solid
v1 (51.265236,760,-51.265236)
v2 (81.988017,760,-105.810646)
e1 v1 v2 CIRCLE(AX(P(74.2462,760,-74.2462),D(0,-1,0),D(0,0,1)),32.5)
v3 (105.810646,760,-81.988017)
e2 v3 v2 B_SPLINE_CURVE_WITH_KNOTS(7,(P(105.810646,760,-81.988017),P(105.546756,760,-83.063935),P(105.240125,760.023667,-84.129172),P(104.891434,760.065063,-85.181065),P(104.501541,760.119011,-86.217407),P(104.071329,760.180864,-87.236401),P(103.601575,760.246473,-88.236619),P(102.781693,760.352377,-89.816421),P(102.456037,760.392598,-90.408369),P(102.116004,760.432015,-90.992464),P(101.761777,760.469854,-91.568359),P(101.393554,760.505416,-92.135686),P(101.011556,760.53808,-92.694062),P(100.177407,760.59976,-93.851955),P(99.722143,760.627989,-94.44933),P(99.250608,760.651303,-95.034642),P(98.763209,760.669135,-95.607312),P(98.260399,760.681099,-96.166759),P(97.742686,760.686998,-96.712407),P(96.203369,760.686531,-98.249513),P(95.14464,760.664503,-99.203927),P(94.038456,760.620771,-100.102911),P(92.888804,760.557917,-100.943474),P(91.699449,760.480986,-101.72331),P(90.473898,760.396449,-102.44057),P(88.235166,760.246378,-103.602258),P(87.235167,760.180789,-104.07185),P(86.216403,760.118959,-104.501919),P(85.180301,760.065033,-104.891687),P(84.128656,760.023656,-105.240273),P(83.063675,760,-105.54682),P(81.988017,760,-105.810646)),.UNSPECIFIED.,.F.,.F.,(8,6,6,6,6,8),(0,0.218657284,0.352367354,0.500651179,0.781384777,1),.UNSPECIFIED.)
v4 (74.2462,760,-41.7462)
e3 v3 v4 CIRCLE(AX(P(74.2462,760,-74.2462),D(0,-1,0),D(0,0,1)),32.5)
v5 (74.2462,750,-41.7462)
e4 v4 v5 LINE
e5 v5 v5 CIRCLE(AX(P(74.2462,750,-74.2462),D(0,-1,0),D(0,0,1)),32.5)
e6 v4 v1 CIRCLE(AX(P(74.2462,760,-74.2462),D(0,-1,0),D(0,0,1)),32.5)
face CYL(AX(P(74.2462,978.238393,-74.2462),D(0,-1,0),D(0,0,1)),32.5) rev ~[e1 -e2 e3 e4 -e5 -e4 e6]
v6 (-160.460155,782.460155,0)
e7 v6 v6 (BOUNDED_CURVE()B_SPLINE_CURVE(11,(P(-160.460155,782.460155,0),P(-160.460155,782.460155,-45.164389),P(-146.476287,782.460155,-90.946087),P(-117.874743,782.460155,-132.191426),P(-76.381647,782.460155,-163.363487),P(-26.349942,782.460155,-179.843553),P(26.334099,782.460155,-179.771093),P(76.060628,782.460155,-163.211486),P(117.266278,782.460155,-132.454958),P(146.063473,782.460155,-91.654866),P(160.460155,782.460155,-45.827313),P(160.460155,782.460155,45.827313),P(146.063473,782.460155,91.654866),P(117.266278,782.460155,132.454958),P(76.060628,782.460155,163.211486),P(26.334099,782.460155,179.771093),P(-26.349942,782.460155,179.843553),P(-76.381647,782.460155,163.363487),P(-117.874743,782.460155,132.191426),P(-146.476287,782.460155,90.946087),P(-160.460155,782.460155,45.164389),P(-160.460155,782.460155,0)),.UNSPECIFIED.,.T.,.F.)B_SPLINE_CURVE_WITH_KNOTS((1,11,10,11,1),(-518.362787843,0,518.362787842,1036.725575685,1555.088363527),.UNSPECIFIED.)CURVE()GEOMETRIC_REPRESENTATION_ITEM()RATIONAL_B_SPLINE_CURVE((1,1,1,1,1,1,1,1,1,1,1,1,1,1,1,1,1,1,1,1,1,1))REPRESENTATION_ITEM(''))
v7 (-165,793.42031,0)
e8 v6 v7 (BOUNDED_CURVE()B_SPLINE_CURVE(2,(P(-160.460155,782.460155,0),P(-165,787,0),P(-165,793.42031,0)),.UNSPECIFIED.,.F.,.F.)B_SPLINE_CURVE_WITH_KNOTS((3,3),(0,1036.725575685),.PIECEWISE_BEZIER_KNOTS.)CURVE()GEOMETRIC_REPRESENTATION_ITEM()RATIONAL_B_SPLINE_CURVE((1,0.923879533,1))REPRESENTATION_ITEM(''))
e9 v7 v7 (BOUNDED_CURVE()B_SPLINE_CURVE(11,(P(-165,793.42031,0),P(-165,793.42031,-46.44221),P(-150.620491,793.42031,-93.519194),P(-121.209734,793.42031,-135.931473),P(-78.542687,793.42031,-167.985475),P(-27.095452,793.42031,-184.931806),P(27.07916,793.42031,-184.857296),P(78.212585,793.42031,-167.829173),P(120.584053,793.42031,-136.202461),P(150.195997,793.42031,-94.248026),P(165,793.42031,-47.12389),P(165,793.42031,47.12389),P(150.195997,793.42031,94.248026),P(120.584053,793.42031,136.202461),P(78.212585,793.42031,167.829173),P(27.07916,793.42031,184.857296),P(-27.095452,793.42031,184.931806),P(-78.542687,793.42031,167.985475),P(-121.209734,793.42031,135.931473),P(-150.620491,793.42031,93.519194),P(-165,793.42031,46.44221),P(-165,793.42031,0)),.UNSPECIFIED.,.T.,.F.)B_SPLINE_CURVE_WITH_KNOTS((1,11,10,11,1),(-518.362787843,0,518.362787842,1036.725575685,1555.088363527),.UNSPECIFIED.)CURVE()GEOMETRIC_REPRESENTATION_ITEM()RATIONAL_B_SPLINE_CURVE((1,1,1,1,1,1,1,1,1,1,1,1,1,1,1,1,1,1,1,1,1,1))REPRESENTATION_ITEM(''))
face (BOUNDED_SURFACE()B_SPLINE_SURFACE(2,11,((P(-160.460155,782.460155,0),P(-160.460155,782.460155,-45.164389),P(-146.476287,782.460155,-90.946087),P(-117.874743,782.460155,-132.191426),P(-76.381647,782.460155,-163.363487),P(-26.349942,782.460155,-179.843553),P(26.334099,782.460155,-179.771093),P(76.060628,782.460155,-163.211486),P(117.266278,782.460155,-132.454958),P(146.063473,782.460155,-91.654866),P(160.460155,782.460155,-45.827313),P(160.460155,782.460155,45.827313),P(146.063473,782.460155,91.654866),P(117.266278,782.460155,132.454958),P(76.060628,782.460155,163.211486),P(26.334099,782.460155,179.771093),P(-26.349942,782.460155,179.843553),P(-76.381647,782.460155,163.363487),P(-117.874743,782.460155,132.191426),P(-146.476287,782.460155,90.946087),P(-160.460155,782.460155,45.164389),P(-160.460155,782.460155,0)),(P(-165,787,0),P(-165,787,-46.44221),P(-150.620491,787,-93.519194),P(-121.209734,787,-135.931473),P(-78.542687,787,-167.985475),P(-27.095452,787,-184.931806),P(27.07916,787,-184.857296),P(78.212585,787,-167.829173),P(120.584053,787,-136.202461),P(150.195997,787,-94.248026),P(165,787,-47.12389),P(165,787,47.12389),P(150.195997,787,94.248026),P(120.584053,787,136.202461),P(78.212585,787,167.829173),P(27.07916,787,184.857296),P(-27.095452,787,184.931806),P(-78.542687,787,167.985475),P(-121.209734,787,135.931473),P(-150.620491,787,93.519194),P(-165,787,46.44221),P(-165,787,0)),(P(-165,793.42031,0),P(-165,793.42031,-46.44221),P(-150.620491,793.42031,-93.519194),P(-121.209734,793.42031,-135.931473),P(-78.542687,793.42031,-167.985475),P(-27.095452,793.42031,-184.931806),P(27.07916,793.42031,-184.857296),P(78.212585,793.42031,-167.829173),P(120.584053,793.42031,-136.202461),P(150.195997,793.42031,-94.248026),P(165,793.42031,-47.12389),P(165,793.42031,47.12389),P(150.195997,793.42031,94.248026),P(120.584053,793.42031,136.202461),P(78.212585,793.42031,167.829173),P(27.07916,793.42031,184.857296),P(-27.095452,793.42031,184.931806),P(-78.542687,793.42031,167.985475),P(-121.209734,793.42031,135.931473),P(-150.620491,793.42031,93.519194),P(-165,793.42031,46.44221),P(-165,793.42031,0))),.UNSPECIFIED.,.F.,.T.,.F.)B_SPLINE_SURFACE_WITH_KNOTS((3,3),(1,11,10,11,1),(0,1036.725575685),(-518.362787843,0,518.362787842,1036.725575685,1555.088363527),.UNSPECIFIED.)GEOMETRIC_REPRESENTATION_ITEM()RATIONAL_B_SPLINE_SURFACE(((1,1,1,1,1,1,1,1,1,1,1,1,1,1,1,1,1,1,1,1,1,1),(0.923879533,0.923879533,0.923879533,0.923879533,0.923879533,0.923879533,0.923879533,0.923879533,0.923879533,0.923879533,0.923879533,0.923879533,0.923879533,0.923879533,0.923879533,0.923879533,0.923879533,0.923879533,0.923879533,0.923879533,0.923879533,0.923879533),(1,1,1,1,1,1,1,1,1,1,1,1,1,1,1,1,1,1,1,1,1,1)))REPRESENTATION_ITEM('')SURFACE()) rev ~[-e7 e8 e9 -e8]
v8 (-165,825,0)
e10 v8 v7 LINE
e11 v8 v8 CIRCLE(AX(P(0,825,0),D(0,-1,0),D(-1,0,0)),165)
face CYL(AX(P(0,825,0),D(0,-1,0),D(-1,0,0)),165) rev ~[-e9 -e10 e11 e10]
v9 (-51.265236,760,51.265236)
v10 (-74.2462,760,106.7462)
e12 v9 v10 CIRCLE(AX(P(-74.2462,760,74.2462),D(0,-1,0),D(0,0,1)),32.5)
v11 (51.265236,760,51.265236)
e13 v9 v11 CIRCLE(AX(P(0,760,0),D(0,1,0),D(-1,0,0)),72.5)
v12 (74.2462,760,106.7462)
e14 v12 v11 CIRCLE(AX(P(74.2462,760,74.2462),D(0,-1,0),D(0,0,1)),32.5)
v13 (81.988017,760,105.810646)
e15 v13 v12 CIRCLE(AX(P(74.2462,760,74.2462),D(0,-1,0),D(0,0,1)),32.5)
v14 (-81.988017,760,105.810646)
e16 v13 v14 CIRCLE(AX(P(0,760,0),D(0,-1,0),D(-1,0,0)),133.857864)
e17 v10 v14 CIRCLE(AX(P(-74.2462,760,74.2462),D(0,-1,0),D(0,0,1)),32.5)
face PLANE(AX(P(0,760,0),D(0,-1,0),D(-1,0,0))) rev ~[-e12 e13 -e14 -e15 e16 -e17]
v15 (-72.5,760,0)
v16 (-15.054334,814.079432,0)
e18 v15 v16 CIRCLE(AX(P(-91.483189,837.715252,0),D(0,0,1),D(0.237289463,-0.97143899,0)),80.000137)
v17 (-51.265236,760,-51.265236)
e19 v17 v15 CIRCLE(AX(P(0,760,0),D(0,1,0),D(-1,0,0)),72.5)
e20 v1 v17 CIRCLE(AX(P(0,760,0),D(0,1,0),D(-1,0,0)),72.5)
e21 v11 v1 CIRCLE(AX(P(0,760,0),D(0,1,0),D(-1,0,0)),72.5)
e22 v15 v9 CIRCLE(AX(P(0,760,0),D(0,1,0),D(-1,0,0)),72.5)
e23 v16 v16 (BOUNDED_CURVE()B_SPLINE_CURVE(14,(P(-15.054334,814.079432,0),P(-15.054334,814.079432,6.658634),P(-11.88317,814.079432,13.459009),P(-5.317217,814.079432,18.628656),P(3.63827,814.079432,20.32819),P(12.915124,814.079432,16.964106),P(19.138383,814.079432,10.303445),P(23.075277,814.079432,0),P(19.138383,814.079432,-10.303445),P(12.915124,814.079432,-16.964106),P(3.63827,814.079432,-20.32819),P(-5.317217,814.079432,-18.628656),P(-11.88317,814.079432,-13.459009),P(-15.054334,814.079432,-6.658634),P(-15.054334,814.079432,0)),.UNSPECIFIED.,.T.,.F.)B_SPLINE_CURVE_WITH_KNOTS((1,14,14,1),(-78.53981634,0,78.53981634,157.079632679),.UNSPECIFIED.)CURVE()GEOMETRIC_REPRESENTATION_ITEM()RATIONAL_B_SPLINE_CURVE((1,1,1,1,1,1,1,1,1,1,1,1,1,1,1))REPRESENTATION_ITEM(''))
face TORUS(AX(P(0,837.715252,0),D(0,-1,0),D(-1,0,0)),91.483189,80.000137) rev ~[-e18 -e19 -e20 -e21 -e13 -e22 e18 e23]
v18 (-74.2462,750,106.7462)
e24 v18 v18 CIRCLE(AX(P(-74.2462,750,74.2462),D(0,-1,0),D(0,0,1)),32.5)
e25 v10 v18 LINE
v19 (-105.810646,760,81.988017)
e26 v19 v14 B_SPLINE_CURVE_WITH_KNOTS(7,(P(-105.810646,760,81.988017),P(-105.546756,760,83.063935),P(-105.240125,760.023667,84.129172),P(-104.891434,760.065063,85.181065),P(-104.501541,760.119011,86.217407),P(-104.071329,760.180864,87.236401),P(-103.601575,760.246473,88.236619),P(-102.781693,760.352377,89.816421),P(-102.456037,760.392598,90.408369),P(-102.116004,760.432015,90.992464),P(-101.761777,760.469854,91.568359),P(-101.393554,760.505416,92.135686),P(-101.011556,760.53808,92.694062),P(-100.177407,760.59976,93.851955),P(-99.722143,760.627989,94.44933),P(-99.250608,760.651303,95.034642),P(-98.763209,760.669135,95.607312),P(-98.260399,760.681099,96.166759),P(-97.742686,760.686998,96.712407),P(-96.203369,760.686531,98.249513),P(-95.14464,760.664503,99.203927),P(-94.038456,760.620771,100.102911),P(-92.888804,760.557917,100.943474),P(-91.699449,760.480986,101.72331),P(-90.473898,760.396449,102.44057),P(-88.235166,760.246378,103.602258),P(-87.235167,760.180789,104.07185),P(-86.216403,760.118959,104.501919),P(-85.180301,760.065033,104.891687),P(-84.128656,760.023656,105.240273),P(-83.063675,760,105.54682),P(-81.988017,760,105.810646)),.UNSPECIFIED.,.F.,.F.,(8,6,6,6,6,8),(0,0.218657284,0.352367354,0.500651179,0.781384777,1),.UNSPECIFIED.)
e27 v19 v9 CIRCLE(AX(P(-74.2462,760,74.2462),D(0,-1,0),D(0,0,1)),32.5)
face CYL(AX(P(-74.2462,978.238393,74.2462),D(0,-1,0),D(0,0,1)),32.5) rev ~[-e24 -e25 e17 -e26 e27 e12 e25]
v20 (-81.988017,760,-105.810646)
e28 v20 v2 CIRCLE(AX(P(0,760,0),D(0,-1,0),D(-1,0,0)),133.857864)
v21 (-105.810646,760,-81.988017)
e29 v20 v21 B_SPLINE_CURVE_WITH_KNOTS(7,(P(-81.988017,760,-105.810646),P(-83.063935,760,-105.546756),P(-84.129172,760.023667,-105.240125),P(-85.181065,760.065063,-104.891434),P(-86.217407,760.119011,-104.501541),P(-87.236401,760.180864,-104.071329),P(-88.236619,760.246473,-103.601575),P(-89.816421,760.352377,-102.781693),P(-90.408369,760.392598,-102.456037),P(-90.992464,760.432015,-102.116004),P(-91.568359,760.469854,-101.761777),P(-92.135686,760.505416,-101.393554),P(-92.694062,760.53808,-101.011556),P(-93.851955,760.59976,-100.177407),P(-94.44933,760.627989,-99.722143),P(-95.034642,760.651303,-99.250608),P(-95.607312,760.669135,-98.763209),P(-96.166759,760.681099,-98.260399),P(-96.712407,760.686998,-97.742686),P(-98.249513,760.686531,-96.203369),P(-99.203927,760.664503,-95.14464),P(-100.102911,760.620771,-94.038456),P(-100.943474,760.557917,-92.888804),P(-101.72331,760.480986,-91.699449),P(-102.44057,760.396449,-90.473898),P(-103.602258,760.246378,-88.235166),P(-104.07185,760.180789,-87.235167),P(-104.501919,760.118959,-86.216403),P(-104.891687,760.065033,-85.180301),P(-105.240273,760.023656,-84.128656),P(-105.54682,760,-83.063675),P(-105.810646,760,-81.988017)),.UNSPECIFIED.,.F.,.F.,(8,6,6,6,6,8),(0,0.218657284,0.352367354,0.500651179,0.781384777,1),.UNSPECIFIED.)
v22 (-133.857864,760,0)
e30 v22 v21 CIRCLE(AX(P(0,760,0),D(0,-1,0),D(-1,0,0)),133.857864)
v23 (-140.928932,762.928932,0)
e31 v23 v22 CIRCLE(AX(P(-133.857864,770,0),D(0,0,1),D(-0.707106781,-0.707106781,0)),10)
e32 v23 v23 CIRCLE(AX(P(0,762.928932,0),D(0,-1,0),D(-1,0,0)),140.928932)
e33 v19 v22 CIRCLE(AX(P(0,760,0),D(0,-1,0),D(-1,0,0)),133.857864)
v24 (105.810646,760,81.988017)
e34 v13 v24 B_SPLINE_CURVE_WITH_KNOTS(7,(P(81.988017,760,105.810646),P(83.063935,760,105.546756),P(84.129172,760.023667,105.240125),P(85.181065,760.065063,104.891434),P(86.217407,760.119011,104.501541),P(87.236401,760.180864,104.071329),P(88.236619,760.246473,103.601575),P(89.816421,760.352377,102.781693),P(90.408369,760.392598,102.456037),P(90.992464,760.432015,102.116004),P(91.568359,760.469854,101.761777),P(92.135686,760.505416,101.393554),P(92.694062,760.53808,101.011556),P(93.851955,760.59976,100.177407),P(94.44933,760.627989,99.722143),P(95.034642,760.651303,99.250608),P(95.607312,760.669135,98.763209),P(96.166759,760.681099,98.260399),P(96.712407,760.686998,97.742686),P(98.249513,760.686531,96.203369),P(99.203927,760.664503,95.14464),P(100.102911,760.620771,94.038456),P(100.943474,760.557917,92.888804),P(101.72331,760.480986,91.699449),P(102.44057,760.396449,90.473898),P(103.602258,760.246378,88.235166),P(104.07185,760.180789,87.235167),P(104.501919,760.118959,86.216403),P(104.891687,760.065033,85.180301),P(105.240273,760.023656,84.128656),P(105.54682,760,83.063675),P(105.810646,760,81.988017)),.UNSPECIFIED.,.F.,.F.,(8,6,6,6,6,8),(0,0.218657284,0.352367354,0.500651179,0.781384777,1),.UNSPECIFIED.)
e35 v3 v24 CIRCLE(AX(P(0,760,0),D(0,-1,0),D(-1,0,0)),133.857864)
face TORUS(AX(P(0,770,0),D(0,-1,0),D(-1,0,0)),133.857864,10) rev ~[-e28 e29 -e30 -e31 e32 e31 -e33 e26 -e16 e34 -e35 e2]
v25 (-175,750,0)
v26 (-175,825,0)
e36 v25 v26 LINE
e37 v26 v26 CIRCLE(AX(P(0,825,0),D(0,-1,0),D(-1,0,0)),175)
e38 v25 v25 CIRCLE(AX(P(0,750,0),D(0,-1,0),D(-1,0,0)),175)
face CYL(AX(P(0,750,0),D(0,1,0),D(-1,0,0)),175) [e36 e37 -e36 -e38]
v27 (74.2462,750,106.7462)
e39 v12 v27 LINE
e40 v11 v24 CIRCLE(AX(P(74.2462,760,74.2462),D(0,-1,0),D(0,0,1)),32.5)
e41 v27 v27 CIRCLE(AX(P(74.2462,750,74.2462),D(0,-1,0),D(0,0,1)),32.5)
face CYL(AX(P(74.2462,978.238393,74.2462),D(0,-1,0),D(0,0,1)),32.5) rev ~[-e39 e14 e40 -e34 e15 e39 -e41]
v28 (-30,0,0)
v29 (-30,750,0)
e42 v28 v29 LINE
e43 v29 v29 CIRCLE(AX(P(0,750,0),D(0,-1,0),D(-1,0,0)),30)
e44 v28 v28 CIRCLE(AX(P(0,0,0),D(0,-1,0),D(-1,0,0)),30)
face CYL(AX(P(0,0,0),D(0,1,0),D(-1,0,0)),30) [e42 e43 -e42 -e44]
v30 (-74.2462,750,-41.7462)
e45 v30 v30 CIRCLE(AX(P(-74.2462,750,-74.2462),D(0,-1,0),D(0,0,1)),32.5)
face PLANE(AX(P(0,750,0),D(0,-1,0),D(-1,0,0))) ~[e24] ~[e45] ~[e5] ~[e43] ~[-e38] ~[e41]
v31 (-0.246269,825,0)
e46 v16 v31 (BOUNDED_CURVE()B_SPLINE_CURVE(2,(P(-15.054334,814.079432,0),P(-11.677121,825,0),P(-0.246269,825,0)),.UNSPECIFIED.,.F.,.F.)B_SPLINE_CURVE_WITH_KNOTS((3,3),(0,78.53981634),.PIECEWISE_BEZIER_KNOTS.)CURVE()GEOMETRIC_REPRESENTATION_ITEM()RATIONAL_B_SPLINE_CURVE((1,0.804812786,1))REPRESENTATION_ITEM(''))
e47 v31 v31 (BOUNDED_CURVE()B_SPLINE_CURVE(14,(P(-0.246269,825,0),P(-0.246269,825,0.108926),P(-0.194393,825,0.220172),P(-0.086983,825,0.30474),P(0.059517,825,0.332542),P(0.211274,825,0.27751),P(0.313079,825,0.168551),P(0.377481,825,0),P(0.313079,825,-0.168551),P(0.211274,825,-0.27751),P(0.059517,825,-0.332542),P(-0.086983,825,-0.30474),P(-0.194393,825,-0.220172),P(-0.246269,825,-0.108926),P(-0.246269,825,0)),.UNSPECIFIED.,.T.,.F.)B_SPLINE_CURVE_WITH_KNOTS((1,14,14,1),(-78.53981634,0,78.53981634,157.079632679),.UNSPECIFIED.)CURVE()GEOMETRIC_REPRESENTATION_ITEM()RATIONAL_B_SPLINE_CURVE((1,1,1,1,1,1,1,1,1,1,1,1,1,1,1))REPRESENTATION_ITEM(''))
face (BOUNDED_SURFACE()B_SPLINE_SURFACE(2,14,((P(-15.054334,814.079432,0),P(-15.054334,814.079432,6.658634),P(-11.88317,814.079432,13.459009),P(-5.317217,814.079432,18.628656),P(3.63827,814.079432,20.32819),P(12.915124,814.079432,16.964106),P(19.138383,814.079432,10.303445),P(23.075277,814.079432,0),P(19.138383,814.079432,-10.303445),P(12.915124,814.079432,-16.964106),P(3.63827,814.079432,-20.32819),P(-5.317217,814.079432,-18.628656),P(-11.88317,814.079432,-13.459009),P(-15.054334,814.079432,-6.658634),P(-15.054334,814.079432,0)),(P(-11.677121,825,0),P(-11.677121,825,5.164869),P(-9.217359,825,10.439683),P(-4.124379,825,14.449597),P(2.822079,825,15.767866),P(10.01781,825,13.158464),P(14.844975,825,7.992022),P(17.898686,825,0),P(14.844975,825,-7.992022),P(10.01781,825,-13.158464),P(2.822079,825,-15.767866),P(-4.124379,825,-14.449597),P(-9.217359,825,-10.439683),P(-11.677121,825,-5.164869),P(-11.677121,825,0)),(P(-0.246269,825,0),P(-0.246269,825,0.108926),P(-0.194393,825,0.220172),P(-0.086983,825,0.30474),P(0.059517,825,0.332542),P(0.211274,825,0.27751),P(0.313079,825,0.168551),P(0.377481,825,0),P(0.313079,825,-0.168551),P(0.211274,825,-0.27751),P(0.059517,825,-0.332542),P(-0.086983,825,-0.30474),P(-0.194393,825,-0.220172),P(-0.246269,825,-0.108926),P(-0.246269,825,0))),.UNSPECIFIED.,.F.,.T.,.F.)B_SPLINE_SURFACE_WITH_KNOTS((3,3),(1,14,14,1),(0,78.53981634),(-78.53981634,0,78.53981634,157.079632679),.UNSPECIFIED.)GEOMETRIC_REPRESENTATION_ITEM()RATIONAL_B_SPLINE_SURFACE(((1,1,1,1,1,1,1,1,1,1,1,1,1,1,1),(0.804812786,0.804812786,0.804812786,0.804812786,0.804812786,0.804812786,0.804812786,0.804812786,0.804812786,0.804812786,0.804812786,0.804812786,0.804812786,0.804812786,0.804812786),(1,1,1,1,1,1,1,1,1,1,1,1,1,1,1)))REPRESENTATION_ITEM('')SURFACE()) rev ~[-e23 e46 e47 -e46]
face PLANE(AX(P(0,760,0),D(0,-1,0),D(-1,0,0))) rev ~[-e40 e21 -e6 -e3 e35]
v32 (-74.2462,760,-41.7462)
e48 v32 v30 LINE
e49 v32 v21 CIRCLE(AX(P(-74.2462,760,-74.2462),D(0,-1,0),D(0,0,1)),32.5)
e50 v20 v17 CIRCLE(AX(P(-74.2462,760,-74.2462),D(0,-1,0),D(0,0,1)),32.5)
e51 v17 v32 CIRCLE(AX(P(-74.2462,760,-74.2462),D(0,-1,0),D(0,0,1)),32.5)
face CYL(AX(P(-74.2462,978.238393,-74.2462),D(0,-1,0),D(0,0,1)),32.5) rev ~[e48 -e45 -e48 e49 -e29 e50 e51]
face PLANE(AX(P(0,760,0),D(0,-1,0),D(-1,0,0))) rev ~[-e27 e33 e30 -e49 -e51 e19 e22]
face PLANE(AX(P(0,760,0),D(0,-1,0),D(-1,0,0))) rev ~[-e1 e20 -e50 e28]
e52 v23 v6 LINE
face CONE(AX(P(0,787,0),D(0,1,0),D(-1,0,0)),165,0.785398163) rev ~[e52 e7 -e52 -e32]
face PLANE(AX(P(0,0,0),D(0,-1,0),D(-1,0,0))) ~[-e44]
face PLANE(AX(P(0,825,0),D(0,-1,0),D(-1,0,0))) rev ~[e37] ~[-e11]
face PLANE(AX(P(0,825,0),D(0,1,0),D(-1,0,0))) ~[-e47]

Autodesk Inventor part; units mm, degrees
ref_plane "YZ Plane" through (0, 0, 0) normal (1, 0, 0) x (0, 1, 0)
ref_plane "XZ Plane" through (0, 0, 0) normal (0, 1, 0) x (-1, 0, 0)
ref_plane "XY Plane" through (0, 0, 0) normal (0, 0, 1) x (1, 0, 0)
sketch "草圖1" plane through (0, 0, 0) normal (0, 0, 1) x (1, 0, 0)
  line L0 (0, 0) -> (-30, 0)
  line L1 (-30, 0) -> (-30, 750)
  line L2 (-30, 750) -> (0, 750)
  line L3 (0, 750) -> (0, 0)
  line L4 (-30, 750) -> (-175, 750)
  line L5 (-175, 750) -> (-175, 825)
  line L6 (-175, 825) -> (-165, 825)
  line L7 (-165, 825) -> (-165, 760)
  line L8 (-165, 760) -> (0, 760)
  line L9 (0, 760) -> (0, 750)
  dimension "d0" = 60
  dimension "d1" = 750
  dimension "d2" = 350
  dimension "d3" = 10
  dimension "d4" = 10
  dimension "d5" = 75
revolve "迴轉1" add sketch "草圖1" angle 360 about axis through (0, 750, 0) along (0, -1, 0)
sketch "草圖2" plane through (0, 760, 0) normal (0, 1, 0) x (1, 0, 0)
  circle A0 centre (0, 0) radius 30 construction
  circle A1 centre (0, 0) radius 105 construction
  line L0 (0, 0) -> (105, 0) construction
  line L1 (74.2462, 74.2462) -> (0, 0) construction
  point P0 (-74.2462, 74.2462)
  point P1 (-74.2462, 74.2462)
  point P2 (-74.2462, -74.2462)
  point P3 (-74.2462, -74.2462)
  point P4 (74.2462, -74.2462)
  point P5 (74.2462, -74.2462)
  dimension "d7" = 210
  dimension "d8" = 45
  dimension "d11" = 360
hole "孔1" at (74.2462, 760, -74.2462) at (-74.2462, 760, -74.2462) at (-74.2462, 760, 74.2462) at (74.2462, 760, 74.2462) direction (0, -1, 0) diameter 65 depth 10
chamfer "倒角1" distance 27 angle 45 1 edges at (165, 760, 0)
sketch "草圖3" plane through (0, 0, 0) normal (0, 0, 1) x (1, 0, 0)
  line L0 (30, 0) -> (-30, 0) construction
  line L1 (-30, 0) -> (-30, 750) construction
  line L2 (-30, 750) -> (-175, 750) construction
  line L3 (-175, 750) -> (-175, 825) construction
  line L4 (-175, 825) -> (-165, 825) construction
  line L5 (-165, 825) -> (-165, 787) construction
  line L6 (-165, 787) -> (-138, 760) construction
  line L7 (-138, 760) -> (138, 760) construction
  line L8 (138, 760) -> (165, 787) construction
  line L9 (165, 787) -> (165, 825) construction
  line L10 (165, 825) -> (175, 825) construction
  line L11 (175, 825) -> (175, 750) construction
  line L12 (175, 750) -> (30, 750) construction
  line L13 (30, 750) -> (30, 0) construction
  line L14 (-138, 760) -> (138, 760) construction
  line L15 (0, 760) -> (0, 825)
  line L16 (-72.5, 760) -> (0, 760)
  line L17 (30, 750) -> (-30, 750) construction
  arc A0 (-72.5, 760) -> (-12.5, 825) centre (-91.4831, 837.7151) ccw
  line L18 (0, 825) -> (-12.5, 825)
  point P0 (0, 0)
  dimension "d23" = 72.5
  dimension "d24" = 65
  dimension "d26" = 80
  dimension "d27" = 25
revolve "迴轉2" add sketch "草圖3" angle 360 about axis through (0, 760, 0) along (0, 1, 0)
fillet "圓角1" radius 15.5 1 edges at (12.5, 825, 0)
fillet "圓角2" radius 15.5 1 edges at (165, 787, 0)
fillet "圓角3" radius 10 1 edges at (138, 760, 0)
properties part number "Medium turntable"
